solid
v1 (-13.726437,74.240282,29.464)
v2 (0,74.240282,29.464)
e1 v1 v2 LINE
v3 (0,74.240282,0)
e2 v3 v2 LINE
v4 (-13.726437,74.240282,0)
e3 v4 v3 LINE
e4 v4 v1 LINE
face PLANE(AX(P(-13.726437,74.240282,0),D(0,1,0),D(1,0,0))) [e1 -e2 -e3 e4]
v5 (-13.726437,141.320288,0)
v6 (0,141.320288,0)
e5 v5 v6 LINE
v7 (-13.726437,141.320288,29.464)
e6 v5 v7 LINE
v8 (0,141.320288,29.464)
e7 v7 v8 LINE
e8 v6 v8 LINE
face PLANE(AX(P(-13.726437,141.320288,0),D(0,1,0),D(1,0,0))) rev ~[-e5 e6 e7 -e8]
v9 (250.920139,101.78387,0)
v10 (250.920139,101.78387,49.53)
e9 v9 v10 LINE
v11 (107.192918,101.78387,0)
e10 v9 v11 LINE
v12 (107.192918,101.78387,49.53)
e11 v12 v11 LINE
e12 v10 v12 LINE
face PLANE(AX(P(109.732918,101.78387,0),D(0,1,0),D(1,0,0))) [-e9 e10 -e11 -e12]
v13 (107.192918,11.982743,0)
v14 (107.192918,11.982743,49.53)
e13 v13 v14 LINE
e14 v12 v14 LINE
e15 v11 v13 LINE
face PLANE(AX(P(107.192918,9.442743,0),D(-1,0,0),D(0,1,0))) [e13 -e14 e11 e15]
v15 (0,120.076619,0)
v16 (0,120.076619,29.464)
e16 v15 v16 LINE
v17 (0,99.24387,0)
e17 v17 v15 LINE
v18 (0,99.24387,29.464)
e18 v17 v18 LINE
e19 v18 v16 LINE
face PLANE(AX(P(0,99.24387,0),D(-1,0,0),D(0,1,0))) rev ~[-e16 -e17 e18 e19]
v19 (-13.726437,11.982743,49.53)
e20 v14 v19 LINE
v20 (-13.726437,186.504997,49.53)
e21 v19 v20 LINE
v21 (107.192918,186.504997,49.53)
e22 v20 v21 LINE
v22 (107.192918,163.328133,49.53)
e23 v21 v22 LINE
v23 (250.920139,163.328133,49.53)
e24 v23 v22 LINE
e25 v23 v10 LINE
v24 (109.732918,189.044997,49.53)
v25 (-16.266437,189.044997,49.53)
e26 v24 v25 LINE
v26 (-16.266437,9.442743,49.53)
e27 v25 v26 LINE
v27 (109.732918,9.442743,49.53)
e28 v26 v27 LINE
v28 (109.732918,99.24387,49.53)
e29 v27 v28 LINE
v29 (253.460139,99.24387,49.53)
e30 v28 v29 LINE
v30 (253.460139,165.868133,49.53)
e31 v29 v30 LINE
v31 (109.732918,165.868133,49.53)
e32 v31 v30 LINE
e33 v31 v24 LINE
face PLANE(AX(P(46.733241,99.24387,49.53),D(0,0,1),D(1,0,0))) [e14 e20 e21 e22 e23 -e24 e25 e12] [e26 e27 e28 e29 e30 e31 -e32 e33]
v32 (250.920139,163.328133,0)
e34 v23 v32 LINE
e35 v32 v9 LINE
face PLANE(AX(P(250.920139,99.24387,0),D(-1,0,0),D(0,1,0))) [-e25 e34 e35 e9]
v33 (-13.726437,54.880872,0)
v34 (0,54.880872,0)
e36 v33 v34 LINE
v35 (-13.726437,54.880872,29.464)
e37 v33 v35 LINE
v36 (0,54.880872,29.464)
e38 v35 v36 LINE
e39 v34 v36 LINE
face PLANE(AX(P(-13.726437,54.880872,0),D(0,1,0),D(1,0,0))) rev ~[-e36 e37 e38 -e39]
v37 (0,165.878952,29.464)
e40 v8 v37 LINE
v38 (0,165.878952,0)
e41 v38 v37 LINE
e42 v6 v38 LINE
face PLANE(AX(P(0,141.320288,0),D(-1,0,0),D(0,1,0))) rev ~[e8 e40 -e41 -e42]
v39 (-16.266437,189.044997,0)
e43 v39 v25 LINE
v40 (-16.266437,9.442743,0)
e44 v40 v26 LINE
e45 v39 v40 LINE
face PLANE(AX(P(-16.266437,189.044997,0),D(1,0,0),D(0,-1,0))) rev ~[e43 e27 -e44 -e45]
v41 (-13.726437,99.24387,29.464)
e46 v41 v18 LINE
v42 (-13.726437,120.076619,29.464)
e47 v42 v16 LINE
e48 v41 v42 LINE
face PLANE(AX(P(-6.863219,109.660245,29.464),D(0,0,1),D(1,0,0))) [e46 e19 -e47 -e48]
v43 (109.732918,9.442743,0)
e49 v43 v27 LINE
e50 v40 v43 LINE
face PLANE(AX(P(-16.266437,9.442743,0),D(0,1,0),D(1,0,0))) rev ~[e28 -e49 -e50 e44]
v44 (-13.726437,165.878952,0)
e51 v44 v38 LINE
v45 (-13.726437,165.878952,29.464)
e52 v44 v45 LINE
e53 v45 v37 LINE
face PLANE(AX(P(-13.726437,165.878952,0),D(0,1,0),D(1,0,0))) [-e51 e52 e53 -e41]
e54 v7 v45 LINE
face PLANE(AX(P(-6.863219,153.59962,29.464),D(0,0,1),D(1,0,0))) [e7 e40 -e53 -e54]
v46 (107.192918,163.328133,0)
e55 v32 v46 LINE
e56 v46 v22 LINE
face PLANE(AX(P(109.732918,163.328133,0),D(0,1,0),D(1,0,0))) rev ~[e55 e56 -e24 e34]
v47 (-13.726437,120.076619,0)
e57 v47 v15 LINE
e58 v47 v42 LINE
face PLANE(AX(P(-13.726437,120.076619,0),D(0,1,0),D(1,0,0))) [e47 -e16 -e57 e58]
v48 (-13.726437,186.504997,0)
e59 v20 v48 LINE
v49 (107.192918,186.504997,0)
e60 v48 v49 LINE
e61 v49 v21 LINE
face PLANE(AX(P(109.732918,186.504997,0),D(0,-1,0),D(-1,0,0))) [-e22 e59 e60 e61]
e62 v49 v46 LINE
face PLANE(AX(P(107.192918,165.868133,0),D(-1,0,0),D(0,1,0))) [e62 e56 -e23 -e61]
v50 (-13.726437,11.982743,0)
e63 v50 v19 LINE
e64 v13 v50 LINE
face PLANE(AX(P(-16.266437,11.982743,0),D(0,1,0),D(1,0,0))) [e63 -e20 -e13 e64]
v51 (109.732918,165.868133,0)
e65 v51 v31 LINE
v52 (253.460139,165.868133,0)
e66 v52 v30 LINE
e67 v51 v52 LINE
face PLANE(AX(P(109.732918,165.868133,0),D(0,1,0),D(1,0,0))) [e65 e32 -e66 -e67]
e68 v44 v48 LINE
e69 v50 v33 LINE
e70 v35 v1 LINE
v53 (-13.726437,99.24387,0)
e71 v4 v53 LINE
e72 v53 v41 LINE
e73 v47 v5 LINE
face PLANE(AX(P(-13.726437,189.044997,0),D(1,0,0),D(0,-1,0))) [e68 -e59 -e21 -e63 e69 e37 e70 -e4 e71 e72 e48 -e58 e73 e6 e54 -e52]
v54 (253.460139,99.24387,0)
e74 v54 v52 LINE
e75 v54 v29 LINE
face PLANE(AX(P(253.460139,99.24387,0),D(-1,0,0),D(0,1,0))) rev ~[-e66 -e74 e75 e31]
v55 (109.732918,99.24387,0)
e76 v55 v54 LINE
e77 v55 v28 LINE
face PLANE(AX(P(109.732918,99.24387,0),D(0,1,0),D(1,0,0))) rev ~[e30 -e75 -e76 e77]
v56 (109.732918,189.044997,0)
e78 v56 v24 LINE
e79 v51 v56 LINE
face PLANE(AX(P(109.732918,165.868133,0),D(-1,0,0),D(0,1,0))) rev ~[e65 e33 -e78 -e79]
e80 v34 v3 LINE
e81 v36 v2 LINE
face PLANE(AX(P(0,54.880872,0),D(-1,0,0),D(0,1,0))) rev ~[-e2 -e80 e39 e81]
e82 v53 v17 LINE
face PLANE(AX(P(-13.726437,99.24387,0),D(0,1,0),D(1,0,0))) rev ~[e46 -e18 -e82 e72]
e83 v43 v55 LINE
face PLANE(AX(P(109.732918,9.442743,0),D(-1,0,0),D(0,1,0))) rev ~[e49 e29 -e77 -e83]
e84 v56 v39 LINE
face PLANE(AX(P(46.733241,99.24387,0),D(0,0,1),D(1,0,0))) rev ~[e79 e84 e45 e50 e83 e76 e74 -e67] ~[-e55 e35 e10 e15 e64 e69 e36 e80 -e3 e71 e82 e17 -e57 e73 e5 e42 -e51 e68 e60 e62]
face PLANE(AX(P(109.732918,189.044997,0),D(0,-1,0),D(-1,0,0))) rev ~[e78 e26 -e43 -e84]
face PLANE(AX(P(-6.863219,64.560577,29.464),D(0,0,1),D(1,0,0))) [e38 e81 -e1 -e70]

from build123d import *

# Parameters (mm, degrees)
F0_W     = 143.7272205949
F0_H     = 66.6242633015
F1_DEPTH = 49.53
F2_T     = -2.54
F3_W     = 13.7264372474
F3_H     = 19.3594098091
F3_H_2   = 20.8327490836
F3_H_3   = 24.5586633682
F4_DEPTH = 29.464


with BuildPart() as f1:
    # F0 (on Top) → F1 (new body)
    with BuildSketch(Plane.XY):
        Polygon((-16.2664372474, 189.0449970961), (-16.2664372474, 9.442742914), (109.7329184413, 9.442742914), (109.7329184413, 99.243870005), (109.7329184413, 165.8681333065), (109.7329184413, 189.0449970961), align=None)
        with Locations((181.5965287387, 132.5560016558)):
            Rectangle(F0_W, F0_H)
    extrude(amount=F1_DEPTH)

    # F2
    f2_openings = [f1.faces().sort_by_distance(p)[0] for p in [
        (86.832403, 109.148631, 49.53),
        (86.832403, 109.148631, 0),
    ]]
    offset(amount=F2_T, openings=f2_openings, kind=Kind.INTERSECTION)

    # F3 (on Top) → F4 (join)
    with BuildSketch(Plane.XY):
        with Locations((-6.8632186237, 64.5605772734)):
            Rectangle(F3_W, F3_H)
        with Locations((-6.8632186237, 109.6602445468)):
            Rectangle(F3_W, F3_H_2)
        with Locations((-6.8632186237, 153.5996198654)):
            Rectangle(F3_W, F3_H_3)
    extrude(amount=F4_DEPTH)


solid = f1.part
